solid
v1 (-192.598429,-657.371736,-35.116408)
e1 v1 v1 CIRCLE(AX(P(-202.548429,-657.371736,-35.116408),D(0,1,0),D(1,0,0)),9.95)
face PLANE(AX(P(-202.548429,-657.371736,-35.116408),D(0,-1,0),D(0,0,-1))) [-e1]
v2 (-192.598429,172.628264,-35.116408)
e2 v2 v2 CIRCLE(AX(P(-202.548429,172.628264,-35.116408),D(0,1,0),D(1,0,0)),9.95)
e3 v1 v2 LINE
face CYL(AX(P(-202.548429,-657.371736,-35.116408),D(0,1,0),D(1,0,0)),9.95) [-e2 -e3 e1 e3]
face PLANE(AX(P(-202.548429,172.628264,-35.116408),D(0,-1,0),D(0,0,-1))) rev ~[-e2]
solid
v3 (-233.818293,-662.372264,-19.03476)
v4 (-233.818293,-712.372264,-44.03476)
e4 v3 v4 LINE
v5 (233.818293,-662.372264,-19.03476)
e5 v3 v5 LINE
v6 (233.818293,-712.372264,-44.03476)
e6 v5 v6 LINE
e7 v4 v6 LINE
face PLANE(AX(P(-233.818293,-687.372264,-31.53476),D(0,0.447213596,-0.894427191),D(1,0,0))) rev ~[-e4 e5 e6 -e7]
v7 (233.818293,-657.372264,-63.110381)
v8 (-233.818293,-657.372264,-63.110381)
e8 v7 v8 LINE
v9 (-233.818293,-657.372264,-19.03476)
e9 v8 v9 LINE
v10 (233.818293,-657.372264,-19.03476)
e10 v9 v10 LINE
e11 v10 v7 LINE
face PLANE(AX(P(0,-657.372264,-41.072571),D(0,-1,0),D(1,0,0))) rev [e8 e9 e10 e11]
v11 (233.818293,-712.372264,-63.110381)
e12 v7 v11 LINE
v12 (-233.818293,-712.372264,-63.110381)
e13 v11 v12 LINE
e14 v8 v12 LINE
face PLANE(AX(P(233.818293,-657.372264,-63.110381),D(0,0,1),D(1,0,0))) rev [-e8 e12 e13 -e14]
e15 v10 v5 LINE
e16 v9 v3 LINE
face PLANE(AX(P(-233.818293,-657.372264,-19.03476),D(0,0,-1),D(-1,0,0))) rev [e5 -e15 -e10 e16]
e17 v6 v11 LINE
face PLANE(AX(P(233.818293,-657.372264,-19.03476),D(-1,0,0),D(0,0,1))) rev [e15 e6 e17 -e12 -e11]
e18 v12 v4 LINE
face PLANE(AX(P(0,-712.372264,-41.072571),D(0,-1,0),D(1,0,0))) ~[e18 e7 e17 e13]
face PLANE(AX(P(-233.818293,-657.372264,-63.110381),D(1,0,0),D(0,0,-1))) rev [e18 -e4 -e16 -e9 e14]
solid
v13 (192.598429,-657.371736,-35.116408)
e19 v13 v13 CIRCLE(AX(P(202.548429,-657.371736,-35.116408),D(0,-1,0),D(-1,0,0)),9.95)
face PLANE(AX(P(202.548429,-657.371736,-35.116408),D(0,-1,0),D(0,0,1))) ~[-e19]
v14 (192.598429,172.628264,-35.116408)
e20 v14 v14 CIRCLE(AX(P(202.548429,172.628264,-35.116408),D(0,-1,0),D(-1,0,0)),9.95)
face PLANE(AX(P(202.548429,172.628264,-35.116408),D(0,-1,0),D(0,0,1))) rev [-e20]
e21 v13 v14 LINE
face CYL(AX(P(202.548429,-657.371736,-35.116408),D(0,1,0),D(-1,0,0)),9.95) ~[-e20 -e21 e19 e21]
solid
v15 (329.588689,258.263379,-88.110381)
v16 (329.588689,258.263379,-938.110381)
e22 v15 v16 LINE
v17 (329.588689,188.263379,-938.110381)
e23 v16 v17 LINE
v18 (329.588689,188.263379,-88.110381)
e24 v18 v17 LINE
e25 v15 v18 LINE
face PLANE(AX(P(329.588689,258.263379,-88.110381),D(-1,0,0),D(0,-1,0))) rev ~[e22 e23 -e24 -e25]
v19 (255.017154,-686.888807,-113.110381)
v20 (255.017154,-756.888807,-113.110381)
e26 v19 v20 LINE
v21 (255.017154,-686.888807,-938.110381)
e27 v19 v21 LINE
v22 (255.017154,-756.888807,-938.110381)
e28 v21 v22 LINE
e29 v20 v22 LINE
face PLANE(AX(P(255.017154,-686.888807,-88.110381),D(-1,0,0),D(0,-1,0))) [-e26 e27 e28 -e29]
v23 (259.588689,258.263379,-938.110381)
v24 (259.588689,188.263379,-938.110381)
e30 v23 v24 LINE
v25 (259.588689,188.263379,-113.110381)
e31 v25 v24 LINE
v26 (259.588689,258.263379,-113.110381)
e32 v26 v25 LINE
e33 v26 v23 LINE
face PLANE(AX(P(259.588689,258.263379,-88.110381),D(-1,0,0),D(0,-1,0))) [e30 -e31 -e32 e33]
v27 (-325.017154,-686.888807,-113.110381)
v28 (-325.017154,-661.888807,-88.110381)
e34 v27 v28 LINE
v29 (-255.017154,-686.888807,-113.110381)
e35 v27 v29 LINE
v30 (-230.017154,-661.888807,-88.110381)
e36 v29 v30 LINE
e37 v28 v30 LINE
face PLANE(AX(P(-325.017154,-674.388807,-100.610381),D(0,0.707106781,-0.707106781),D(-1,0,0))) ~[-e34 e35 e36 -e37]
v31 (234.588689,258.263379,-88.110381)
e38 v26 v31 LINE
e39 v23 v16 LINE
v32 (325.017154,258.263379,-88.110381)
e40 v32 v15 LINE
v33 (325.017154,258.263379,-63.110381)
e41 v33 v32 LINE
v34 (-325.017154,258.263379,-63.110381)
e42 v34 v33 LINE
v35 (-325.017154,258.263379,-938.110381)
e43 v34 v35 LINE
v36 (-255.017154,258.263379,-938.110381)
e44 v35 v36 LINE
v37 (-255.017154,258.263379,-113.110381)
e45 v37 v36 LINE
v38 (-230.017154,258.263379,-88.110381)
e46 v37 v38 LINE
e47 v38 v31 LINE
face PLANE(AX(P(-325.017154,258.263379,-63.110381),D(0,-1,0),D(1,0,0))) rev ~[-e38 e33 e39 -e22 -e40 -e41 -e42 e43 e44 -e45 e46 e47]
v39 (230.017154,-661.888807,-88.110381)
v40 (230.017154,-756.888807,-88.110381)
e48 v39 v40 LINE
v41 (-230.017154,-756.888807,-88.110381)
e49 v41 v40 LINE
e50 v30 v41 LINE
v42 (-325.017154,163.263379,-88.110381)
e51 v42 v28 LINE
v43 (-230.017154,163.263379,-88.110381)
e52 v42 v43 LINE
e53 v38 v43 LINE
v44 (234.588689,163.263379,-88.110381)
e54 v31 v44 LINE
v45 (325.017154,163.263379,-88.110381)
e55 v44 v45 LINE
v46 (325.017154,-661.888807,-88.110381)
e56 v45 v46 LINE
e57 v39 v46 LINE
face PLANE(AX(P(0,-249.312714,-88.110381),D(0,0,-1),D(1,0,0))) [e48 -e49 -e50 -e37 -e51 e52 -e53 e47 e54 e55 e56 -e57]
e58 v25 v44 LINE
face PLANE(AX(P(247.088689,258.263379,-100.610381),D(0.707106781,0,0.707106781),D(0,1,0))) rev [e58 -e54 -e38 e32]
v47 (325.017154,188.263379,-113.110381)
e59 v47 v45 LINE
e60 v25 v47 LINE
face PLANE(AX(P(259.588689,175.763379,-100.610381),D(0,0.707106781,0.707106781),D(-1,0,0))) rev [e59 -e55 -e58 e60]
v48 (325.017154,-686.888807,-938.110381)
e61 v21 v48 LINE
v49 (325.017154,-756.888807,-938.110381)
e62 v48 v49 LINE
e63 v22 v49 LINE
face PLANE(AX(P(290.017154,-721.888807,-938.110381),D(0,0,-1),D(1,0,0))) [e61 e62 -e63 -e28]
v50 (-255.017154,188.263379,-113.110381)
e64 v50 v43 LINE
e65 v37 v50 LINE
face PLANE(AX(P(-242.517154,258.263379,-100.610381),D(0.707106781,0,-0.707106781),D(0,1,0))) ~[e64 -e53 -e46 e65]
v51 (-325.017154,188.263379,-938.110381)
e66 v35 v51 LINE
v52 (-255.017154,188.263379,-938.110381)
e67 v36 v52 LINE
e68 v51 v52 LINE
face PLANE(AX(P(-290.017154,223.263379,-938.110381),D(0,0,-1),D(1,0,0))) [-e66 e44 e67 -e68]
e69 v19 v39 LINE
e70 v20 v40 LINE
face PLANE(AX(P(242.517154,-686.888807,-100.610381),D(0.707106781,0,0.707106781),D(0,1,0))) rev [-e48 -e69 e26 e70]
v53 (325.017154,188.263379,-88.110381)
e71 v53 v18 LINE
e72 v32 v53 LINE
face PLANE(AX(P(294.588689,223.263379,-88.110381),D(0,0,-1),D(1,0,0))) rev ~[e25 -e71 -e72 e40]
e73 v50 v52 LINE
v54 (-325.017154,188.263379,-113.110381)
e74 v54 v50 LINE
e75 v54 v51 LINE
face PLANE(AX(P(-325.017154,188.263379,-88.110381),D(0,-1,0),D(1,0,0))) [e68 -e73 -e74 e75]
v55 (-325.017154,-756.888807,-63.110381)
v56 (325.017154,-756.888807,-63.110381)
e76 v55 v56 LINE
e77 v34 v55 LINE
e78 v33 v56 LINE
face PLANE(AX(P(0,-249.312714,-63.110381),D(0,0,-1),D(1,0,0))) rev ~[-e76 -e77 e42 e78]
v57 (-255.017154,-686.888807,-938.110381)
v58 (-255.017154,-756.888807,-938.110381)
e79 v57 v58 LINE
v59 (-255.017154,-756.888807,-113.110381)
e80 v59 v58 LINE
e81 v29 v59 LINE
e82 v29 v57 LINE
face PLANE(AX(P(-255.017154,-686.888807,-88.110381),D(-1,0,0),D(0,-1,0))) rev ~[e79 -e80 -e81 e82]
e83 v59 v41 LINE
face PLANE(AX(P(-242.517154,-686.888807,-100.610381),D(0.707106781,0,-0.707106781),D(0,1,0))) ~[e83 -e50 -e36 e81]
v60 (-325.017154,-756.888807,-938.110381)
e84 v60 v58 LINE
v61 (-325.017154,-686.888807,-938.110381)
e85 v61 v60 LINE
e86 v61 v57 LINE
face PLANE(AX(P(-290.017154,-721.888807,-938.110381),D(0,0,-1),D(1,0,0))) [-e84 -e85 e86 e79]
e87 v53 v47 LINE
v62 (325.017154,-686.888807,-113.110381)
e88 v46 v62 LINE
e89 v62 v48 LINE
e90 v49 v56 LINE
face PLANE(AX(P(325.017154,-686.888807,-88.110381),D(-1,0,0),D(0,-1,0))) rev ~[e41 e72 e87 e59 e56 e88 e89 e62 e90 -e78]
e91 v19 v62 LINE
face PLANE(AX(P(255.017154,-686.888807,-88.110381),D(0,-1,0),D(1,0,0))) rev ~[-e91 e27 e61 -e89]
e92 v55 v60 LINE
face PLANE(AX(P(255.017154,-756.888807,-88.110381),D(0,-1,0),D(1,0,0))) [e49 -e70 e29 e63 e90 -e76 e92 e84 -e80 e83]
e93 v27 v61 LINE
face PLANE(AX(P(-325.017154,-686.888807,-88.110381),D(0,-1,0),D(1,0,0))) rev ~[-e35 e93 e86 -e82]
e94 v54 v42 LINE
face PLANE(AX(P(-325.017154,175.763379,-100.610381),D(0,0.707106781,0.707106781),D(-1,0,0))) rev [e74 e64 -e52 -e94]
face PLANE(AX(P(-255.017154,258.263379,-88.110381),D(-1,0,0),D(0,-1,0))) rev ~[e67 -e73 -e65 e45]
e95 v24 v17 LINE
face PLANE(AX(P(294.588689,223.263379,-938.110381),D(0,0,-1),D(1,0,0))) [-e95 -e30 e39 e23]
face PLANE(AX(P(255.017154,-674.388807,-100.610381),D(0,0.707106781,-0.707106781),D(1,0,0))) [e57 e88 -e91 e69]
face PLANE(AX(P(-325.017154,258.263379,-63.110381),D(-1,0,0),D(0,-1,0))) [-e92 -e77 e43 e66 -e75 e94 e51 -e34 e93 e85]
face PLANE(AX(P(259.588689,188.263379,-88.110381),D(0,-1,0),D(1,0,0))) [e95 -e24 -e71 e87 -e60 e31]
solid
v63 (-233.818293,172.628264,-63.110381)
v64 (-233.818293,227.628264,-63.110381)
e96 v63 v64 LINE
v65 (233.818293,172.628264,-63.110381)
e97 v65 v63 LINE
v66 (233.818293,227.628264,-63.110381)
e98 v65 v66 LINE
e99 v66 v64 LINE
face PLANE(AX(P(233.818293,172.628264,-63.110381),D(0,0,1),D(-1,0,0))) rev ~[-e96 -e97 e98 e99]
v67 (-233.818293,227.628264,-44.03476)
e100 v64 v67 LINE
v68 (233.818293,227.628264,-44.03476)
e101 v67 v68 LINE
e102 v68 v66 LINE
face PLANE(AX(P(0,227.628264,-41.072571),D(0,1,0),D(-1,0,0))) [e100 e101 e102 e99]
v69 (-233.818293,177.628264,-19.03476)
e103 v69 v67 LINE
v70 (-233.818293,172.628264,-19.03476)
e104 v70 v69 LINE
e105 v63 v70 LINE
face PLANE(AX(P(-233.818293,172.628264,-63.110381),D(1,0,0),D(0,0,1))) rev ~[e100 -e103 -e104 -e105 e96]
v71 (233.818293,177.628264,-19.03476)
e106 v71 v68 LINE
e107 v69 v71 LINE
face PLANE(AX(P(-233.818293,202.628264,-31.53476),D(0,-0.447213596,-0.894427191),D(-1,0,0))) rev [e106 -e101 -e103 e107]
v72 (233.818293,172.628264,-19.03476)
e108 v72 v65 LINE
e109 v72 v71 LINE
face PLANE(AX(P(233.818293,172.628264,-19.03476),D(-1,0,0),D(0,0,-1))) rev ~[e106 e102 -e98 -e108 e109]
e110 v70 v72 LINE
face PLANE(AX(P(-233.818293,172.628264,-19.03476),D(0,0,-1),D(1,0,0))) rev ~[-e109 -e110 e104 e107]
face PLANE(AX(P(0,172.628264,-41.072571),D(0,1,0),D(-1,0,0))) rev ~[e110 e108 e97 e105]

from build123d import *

# Parameters (mm, degrees)
F0_R      = 9.95
F7_DEPTH  = 55
F8_SIZE2  = 25
F8_SIZE   = 50
F10_W     = 650.0343084335
F10_H     = 1015.1521861553
F11_DEPTH = 25
F12_W     = 70
F12_H     = 70
F13_DEPTH = 850
F14_SIZE  = 25


with BuildPart() as f4:
    # F4: sweep along a path in F3
    with BuildLine(Plane.YZ.offset(-202.5484293699)) as f4_path:
        Line((-657.3717359189, -35.4168222417), (0, -35.4168222417))
        Line((0, -35.4168222417), (172.6282640811, -35.4168222417))
    # F0 (on Front) → F4 (sweep)
    with BuildSketch(Plane.XZ):
        with Locations((-202.5484293699, -35.1164080203)):
            Circle(F0_R)
    sweep(path=f4_path.line)


with BuildPart() as f5_1:
    # F5: instance of F4
    add(f4.part.mirror(Plane.YZ))


with BuildPart() as f7:
    # F6 (on face) → F7 (new body)
    with BuildSketch(Plane(origin=(0, 172.6282640811, 0), x_dir=(-1, 0, 0), z_dir=(0, 1, 0))):
        Polygon((0, -19.0347600728), (-233.8182926178, -19.0347600728), (-233.8182926178, -63.1103813648), (0, -63.1103813648), (233.8182926178, -63.1103813648), (233.8182926178, -19.0347600728), align=None)
    extrude(amount=F7_DEPTH)

    # F8
    f8_edges = [f7.edges().sort_by_distance(p)[0] for p in [
        (0, 227.628264, -19.03476),
    ]]
    f8_side = f7.faces().sort_by_distance((0, 200.128264, -19.03476))[0]
    chamfer(f8_edges, length=F8_SIZE, length2=F8_SIZE2, reference=f8_side)


with BuildPart() as f9_1:
    # F9: instance of F7
    add(f7.part.mirror(Plane.XZ.offset(242.372)))


with BuildPart() as f11:
    # F10 (on face) → F11 (new body)
    with BuildSketch(Plane(origin=(0, 0, -63.1103813648), x_dir=(1, 0, 0), z_dir=(0, 0, -1))):
        with Locations((0, 249.3127137423)):
            Rectangle(F10_W, F10_H)
    extrude(amount=F11_DEPTH)

    # F12 (on face) → F13 (join)
    with BuildSketch(Plane(origin=(0, 0, -88.1103813648), x_dir=(1, 0, 0), z_dir=(0, 0, -1))):
        with Locations((290.0171542168, 721.8888068199)):
            Rectangle(F12_W, F12_H)
        with Locations((294.588688612, -223.2633793354)):
            Rectangle(F12_W, F12_H)
        with Locations((-290.0171542168, -223.2633793354)):
            Rectangle(F12_W, F12_H)
        with Locations((-290.0171542168, 721.8888068199)):
            Rectangle(F12_W, F12_H)
    extrude(amount=F13_DEPTH)

    # F14
    f14_edges = [f11.edges().sort_by_distance(p)[0] for p in [
        (-255.017154, 223.263379, -88.110381),
        (-290.017154, 188.263379, -88.110381),
        (-255.017154, -721.888807, -88.110381),
        (292.302921, 188.263379, -88.110381),
        (259.588689, 223.263379, -88.110381),
        (255.017154, -721.888807, -88.110381),
        (290.017154, -686.888807, -88.110381),
        (-290.017154, -686.888807, -88.110381),
    ]]
    chamfer(f14_edges, length=F14_SIZE)


solid = Compound([f4.part, f5_1.part, f7.part, f9_1.part, f11.part])
